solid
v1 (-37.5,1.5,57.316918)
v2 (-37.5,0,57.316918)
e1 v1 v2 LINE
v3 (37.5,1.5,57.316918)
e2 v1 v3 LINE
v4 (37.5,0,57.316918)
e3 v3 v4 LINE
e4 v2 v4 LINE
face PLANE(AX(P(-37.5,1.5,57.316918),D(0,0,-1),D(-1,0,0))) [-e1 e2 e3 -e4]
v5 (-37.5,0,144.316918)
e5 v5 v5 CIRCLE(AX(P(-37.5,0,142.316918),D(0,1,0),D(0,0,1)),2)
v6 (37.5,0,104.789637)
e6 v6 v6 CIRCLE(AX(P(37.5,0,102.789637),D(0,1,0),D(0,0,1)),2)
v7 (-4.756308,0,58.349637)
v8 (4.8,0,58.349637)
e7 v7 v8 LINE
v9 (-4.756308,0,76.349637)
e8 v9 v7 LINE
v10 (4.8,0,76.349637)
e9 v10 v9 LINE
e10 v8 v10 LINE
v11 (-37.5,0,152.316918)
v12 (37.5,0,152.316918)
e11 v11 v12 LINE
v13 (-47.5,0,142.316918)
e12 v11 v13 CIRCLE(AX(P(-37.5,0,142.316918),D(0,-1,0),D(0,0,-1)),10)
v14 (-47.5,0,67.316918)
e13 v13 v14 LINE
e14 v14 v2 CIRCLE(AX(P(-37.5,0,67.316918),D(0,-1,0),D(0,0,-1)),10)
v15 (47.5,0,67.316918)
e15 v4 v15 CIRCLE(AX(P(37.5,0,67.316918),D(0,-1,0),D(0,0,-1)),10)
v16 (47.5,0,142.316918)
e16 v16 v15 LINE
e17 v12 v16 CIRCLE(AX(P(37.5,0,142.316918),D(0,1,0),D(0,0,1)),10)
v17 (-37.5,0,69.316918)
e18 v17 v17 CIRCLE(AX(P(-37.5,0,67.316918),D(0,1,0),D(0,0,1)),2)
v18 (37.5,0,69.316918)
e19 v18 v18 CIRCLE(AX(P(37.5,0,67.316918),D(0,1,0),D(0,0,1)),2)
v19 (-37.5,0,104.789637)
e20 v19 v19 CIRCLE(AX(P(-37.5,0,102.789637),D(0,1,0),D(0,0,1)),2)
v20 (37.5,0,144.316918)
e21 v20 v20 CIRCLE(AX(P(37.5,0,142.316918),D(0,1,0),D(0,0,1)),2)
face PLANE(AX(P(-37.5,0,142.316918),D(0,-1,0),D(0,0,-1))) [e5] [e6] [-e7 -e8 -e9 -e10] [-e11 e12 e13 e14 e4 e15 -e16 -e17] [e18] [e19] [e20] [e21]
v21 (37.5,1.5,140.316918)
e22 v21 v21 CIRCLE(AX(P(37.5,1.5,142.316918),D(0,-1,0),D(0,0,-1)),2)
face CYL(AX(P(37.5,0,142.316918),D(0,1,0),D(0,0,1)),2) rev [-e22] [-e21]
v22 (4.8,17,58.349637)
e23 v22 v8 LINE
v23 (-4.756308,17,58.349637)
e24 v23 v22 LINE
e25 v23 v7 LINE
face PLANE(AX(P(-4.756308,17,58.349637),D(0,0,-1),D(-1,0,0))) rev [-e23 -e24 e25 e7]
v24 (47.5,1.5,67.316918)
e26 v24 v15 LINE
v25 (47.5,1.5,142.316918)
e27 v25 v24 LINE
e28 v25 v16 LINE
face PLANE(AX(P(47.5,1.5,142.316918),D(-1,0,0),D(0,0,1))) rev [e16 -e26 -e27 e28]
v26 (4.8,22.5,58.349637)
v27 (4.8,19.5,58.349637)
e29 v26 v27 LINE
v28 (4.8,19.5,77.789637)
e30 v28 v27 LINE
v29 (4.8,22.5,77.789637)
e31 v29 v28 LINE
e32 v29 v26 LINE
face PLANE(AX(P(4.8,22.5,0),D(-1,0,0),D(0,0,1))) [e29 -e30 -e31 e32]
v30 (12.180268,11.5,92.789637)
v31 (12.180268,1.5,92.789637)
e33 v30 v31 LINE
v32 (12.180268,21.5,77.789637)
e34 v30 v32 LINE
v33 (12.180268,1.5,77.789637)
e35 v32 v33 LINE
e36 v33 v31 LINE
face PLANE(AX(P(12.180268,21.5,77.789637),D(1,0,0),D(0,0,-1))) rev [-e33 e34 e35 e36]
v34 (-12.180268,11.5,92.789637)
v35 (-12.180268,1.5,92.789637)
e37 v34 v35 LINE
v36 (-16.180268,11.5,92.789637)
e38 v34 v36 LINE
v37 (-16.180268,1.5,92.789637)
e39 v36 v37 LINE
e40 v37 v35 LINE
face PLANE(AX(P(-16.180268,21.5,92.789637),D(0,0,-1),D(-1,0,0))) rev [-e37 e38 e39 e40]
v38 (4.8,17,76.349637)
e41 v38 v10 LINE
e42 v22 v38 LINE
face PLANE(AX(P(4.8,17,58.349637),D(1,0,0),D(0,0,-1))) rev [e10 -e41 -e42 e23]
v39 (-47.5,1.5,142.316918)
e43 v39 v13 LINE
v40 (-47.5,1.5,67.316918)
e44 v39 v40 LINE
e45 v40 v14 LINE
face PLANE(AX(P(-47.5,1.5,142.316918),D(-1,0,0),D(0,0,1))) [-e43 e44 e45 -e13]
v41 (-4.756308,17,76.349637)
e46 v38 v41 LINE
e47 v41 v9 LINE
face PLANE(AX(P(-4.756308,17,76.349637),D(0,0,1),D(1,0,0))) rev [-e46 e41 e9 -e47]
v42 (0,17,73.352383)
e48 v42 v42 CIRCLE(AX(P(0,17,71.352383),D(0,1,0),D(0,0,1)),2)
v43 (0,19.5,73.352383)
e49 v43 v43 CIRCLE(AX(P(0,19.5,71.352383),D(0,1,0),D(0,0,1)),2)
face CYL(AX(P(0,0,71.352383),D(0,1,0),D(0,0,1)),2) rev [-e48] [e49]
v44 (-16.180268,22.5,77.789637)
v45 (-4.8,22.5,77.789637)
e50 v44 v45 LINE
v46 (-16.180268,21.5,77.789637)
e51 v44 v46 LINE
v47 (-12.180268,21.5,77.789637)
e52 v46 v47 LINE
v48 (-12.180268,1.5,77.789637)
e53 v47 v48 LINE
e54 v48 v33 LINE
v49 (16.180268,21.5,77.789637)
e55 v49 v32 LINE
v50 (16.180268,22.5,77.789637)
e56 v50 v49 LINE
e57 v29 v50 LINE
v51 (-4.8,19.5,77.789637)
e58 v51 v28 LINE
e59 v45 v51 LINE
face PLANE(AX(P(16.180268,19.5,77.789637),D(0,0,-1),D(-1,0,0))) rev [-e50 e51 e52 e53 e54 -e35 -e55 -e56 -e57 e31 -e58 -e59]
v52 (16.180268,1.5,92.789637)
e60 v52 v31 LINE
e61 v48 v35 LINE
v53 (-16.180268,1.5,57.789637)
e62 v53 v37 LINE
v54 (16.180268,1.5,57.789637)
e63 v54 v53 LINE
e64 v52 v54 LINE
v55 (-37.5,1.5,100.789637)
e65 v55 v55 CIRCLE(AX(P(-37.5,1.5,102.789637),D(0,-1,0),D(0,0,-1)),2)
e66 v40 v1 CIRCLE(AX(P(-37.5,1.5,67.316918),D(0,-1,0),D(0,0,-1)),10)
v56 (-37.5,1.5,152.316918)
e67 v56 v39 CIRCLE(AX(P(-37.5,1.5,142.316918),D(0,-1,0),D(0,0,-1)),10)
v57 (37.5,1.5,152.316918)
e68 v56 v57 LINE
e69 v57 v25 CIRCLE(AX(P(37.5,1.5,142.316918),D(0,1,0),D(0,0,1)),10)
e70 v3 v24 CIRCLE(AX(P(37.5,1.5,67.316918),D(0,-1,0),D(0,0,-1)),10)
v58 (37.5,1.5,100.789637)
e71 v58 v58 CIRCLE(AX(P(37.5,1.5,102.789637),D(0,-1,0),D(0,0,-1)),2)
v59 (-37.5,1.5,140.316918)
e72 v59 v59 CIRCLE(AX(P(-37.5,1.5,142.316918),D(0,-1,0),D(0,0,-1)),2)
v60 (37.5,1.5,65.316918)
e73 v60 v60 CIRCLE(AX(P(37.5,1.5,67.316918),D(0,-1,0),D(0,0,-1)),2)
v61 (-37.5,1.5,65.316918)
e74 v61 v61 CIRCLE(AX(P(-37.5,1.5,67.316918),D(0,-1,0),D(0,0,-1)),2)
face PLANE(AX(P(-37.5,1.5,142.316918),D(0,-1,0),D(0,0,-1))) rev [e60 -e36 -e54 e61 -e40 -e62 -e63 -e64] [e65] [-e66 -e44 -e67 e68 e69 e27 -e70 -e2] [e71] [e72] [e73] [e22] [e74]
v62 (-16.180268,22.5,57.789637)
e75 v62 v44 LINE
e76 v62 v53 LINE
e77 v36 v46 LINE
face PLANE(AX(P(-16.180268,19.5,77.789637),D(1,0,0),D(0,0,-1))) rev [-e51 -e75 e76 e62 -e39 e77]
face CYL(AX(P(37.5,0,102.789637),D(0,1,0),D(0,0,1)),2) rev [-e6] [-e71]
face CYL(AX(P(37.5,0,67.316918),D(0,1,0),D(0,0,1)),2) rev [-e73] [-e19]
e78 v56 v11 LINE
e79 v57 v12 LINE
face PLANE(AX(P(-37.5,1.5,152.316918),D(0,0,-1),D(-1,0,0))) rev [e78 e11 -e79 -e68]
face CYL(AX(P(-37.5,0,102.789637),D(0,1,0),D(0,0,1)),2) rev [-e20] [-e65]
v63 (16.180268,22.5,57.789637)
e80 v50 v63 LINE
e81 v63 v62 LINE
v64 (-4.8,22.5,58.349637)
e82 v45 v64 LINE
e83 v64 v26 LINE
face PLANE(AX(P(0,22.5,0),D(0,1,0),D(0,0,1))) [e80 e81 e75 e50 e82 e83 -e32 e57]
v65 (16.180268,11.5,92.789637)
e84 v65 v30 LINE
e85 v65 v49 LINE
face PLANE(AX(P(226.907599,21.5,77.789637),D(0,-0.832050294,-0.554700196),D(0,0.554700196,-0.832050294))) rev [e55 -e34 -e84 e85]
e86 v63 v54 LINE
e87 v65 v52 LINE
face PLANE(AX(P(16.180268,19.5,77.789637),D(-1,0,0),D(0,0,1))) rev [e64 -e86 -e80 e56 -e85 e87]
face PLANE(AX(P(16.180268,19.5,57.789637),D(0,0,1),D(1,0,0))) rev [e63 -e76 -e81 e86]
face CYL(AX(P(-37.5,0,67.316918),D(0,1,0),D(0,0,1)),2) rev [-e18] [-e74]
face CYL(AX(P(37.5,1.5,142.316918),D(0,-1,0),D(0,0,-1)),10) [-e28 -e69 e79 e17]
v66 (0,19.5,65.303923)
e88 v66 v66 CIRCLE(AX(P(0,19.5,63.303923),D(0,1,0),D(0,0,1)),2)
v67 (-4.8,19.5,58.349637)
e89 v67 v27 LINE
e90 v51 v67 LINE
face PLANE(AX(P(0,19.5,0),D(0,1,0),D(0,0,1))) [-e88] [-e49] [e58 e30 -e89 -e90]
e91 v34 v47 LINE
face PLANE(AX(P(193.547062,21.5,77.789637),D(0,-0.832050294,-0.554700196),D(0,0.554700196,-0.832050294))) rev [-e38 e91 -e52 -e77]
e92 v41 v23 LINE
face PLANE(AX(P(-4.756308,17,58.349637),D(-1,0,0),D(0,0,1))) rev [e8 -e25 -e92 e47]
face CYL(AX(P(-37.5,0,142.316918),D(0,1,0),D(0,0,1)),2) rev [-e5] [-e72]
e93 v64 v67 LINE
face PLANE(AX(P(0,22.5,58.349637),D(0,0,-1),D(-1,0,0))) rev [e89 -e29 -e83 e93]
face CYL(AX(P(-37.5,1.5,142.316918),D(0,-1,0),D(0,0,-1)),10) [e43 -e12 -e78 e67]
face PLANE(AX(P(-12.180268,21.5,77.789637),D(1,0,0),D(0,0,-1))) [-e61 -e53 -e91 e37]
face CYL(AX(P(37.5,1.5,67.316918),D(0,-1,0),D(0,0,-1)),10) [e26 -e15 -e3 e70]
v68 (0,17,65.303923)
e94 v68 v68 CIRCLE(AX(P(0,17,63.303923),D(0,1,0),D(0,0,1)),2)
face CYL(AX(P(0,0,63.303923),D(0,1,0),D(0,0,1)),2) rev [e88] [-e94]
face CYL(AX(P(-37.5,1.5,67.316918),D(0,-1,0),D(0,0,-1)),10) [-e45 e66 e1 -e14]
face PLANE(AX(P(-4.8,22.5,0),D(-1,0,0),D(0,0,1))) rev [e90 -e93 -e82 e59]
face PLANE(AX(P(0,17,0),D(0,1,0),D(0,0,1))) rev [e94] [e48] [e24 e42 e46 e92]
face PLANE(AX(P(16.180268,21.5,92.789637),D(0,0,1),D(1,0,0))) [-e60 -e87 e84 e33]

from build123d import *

# Parameters (mm, degrees)
EXTRUDE_1_DEPTH      = 1.5
SKETCH_2_W           = 32.36053695
SKETCH_2_H           = 20
EXTRUDE_2_DEPTH      = 18
SKETCH_3_W           = 3.3
SKETCH_3_H           = 0.56
SKETCH_3_W_2         = 0.5
SKETCH_3_W_3         = 1
EXTRUDE_4_DEPTH      = 3
SKETCH_6_W           = 4
SKETCH_6_H           = 15
EXTRUDE_7_DEPTH      = 20
CUT_EXTRUDE_START    = -4
CUT_EXTRUDE_3_DEPTH  = 4
CUT_EXTRUDE_4_DEPTH  = 4
SKETCH_12_R          = 1
CUT_EXTRUDE_9_DEPTH  = 71.381105419
SKETCH_14_R          = 1
CUT_EXTRUDE_10_DEPTH = 71.381105419
SKETCH_15_R          = 1
CUT_EXTRUDE_12_DEPTH = 71.381105419
SKETCH_16_W          = 9.556308291
SKETCH_16_H          = 18
CUT_EXTRUDE_13_DEPTH = 17
CUT_EXTRUDE_14_DEPTH = 161.738742996
SKETCH_18_R          = 2
CUT_EXTRUDE_15_DEPTH = 161.738742996


# Read off the part's stored shape, not the designer's step: 切除-拉伸3, 切除-拉伸4
with BuildPart() as part:
    # 草图1 → 凸台-拉伸1 (new body)
    with BuildSketch(Plane(origin=(0, 0, 104.816917971), x_dir=(1, 0, 0), z_dir=(0, 1, 0))):
        with BuildLine():
            Line((-37.5, -47.5), (37.5, -47.5))
            ThreePointArc((37.5, -47.5), (44.571067812, -44.571067812), (47.5, -37.5))
            Line((47.5, -37.5), (47.5, 37.5))
            ThreePointArc((47.5, 37.5), (44.571067812, 44.571067812), (37.5, 47.5))
            Line((37.5, 47.5), (-37.5, 47.5))
            ThreePointArc((-37.5, 47.5), (-44.571067812, 44.571067812), (-47.5, 37.5))
            Line((-47.5, 37.5), (-47.5, -37.5))
            ThreePointArc((-47.5, -37.5), (-44.571067812, -44.571067812), (-37.5, -47.5))
        make_face()
    extrude(amount=EXTRUDE_1_DEPTH)

    # 草图2 → 凸台-拉伸2 (add)
    with BuildSketch(Plane(origin=(0, 1.5, 104.816917971), x_dir=(1, 0, 0), z_dir=(0, 1, 0))):
        with Locations((0, 37.027280992)):
            Rectangle(SKETCH_2_W, SKETCH_2_H)
    extrude(amount=EXTRUDE_2_DEPTH)

    # 草图3 → 凸台-拉伸4 (add)
    with BuildSketch(Plane(origin=(0, 19.5, 62.644818489), x_dir=(1, 0, 0), z_dir=(0, 1, 0))):
        with Locations((2.15, 4.575181511)):
            Rectangle(SKETCH_3_W, SKETCH_3_H)
        with Locations((-2.15, 4.575181511)):
            Rectangle(SKETCH_3_W, SKETCH_3_H)
        with Locations((-0.25, 4.575181511)):
            Rectangle(SKETCH_3_W_2, SKETCH_3_H)
        with Locations((0.25, 4.575181511)):
            Rectangle(SKETCH_3_W_2, SKETCH_3_H)
        with Locations((4.3, 4.575181511)):
            Rectangle(SKETCH_3_W_3, SKETCH_3_H)
        with Locations((-4.3, 4.575181511)):
            Rectangle(SKETCH_3_W_3, SKETCH_3_H)
        Polygon((4.8, 4.295181511), (4.8, -15.144818489), (16.180268475, -15.144818489), (16.180268475, 4.855181511), (4.8, 4.855181511), align=None)
        Polygon((-4.8, -15.144818489), (-4.8, 4.295181511), (-4.8, 4.855181511), (-16.180268475, 4.855181511), (-16.180268475, -15.144818489), align=None)
    extrude(amount=EXTRUDE_4_DEPTH)

    # 草图6 → 凸台-拉伸7 (add)
    with BuildSketch(Plane(origin=(0, 1.5, 104.816917971), x_dir=(1, 0, 0), z_dir=(0, 1, 0))):
        with Locations((14.180268475, 19.527280992)):
            Rectangle(SKETCH_6_W, SKETCH_6_H)
        with Locations((-14.180268475, 19.527280992)):
            Rectangle(SKETCH_6_W, SKETCH_6_H)
    extrude(amount=EXTRUDE_7_DEPTH)

    # 切除-拉伸3 outline → 切除-拉伸3 (cut)
    with BuildSketch(Plane(origin=(16.180268475, 0, 62.644818489), x_dir=(0, 0, -1), z_dir=(1, 0, 0)).offset(CUT_EXTRUDE_START)):
        Polygon((-30.144818489, 21.5), (-30.144818489, 11.5), (-15.144818489, 21.5), align=None)
    extrude(amount=CUT_EXTRUDE_3_DEPTH, mode=Mode.SUBTRACT)

    # 切除-拉伸4 outline → 切除-拉伸4 (cut)
    with BuildSketch(Plane(origin=(-12.180268475, 0, 70.144818489), x_dir=(0, 0, -1), z_dir=(1, 0, 0)).offset(CUT_EXTRUDE_START)):
        Polygon((-22.644818489, 21.5), (-22.644818489, 11.5), (-7.644818489, 21.5), align=None)
    extrude(amount=CUT_EXTRUDE_4_DEPTH, mode=Mode.SUBTRACT)

    # 草图12 → 切除-拉伸9 (cut, through all)
    with BuildSketch(Plane(origin=(0, 1.5, 104.816917971), x_dir=(1, 0, 0), z_dir=(0, 1, 0))):
        with Locations(Location((-37.5, -37.5, 0), (0, 0, 270))):
            Circle(SKETCH_12_R)
        with Locations(Location((37.5, -37.5, 0), (0, 0, 270))):
            Circle(SKETCH_12_R)
        with Locations(Location((37.5, 37.5, 0), (0, 0, 270))):
            Circle(SKETCH_12_R)
    extrude(amount=-CUT_EXTRUDE_9_DEPTH, mode=Mode.SUBTRACT)

    # 草图14 → 切除-拉伸10 (cut, through all)
    with BuildSketch(Plane(origin=(0, 1.5, 104.816917971), x_dir=(1, 0, 0), z_dir=(0, 1, 0))):
        with Locations(Location((-37.5, 37.5, 0), (0, 0, 270))):
            Circle(SKETCH_14_R)
    extrude(amount=-CUT_EXTRUDE_10_DEPTH, mode=Mode.SUBTRACT)

    # 草图15 → 切除-拉伸12 (cut, through all)
    with BuildSketch(Plane(origin=(0, 1.5, 104.816917971), x_dir=(1, 0, 0), z_dir=(0, 1, 0))):
        with Locations(Location((-37.5, 2.027280992, 0), (0, 0, 270))):
            Circle(SKETCH_15_R)
        with Locations(Location((37.5, 2.027280992, 0), (0, 0, 270))):
            Circle(SKETCH_15_R)
    extrude(amount=-CUT_EXTRUDE_12_DEPTH, mode=Mode.SUBTRACT)

    # 草图16 → 切除-拉伸13 (cut)
    with BuildSketch(Plane(origin=(0, 0, 0), x_dir=(-1, 0, 0), z_dir=(0, -1, 0))):
        with Locations((-0.021845855, -67.349636979)):
            Rectangle(SKETCH_16_W, SKETCH_16_H)
    extrude(amount=-CUT_EXTRUDE_13_DEPTH, mode=Mode.SUBTRACT)

    # 草图17 → 切除-拉伸14 (cut, through all)
    with BuildSketch(Plane(origin=(0, 19.5, 0), x_dir=(1, 0, 0), z_dir=(0, 1, 0))):
        with BuildLine():
            ThreePointArc((0, -70.3523833), (-1, -71.3523833), (0, -72.3523833))
            Line((0, -72.3523833), (0, -71.3523833))
            Line((0, -71.3523833), (0, -70.3523833))
        make_face()
        with BuildLine():
            Line((0, -71.3523833), (0, -72.3523833))
            ThreePointArc((0, -72.3523833), (0.707106781, -72.059490081), (1, -71.3523833))
            ThreePointArc((1, -71.3523833), (0.707106781, -70.645276519), (0, -70.3523833))
            Line((0, -70.3523833), (0, -71.3523833))
        make_face()
        with BuildLine():
            ThreePointArc((0, -62.303923017), (-1, -63.303923017), (0, -64.303923017))
            Line((0, -64.303923017), (0, -63.303923017))
            Line((0, -63.303923017), (0, -62.303923017))
        make_face()
        with BuildLine():
            Line((0, -63.303923017), (0, -64.303923017))
            ThreePointArc((0, -64.303923017), (0.707106781, -64.011029798), (1, -63.303923017))
            ThreePointArc((1, -63.303923017), (0.707106781, -62.596816236), (0, -62.303923017))
            Line((0, -62.303923017), (0, -63.303923017))
        make_face()
    extrude(amount=-CUT_EXTRUDE_14_DEPTH, mode=Mode.SUBTRACT)

    # 草图18 → 切除-拉伸15 (cut, through all)
    with BuildSketch(Plane(origin=(0, 19.5, 0), x_dir=(1, 0, 0), z_dir=(0, 1, 0))):
        with Locations(Location((0, -63.303923017, 0), (0, 0, 270))):
            Circle(SKETCH_18_R)
        with Locations(Location((0, -71.3523833, 0), (0, 0, 270))):
            Circle(SKETCH_18_R)
        with Locations(Location((-37.5, -67.316917971, 0), (0, 0, 270))):
            Circle(SKETCH_18_R)
        with Locations(Location((37.5, -67.316917971, 0), (0, 0, 270))):
            Circle(SKETCH_18_R)
        with Locations(Location((37.5, -102.789636979, 0), (0, 0, 270))):
            Circle(SKETCH_18_R)
        with Locations(Location((-37.5, -102.789636979, 0), (0, 0, 270))):
            Circle(SKETCH_18_R)
        with Locations(Location((-37.5, -142.316917971, 0), (0, 0, 270))):
            Circle(SKETCH_18_R)
        with Locations(Location((37.5, -142.316917971, 0), (0, 0, 270))):
            Circle(SKETCH_18_R)
    extrude(amount=-CUT_EXTRUDE_15_DEPTH, mode=Mode.SUBTRACT)


solid = part.part
